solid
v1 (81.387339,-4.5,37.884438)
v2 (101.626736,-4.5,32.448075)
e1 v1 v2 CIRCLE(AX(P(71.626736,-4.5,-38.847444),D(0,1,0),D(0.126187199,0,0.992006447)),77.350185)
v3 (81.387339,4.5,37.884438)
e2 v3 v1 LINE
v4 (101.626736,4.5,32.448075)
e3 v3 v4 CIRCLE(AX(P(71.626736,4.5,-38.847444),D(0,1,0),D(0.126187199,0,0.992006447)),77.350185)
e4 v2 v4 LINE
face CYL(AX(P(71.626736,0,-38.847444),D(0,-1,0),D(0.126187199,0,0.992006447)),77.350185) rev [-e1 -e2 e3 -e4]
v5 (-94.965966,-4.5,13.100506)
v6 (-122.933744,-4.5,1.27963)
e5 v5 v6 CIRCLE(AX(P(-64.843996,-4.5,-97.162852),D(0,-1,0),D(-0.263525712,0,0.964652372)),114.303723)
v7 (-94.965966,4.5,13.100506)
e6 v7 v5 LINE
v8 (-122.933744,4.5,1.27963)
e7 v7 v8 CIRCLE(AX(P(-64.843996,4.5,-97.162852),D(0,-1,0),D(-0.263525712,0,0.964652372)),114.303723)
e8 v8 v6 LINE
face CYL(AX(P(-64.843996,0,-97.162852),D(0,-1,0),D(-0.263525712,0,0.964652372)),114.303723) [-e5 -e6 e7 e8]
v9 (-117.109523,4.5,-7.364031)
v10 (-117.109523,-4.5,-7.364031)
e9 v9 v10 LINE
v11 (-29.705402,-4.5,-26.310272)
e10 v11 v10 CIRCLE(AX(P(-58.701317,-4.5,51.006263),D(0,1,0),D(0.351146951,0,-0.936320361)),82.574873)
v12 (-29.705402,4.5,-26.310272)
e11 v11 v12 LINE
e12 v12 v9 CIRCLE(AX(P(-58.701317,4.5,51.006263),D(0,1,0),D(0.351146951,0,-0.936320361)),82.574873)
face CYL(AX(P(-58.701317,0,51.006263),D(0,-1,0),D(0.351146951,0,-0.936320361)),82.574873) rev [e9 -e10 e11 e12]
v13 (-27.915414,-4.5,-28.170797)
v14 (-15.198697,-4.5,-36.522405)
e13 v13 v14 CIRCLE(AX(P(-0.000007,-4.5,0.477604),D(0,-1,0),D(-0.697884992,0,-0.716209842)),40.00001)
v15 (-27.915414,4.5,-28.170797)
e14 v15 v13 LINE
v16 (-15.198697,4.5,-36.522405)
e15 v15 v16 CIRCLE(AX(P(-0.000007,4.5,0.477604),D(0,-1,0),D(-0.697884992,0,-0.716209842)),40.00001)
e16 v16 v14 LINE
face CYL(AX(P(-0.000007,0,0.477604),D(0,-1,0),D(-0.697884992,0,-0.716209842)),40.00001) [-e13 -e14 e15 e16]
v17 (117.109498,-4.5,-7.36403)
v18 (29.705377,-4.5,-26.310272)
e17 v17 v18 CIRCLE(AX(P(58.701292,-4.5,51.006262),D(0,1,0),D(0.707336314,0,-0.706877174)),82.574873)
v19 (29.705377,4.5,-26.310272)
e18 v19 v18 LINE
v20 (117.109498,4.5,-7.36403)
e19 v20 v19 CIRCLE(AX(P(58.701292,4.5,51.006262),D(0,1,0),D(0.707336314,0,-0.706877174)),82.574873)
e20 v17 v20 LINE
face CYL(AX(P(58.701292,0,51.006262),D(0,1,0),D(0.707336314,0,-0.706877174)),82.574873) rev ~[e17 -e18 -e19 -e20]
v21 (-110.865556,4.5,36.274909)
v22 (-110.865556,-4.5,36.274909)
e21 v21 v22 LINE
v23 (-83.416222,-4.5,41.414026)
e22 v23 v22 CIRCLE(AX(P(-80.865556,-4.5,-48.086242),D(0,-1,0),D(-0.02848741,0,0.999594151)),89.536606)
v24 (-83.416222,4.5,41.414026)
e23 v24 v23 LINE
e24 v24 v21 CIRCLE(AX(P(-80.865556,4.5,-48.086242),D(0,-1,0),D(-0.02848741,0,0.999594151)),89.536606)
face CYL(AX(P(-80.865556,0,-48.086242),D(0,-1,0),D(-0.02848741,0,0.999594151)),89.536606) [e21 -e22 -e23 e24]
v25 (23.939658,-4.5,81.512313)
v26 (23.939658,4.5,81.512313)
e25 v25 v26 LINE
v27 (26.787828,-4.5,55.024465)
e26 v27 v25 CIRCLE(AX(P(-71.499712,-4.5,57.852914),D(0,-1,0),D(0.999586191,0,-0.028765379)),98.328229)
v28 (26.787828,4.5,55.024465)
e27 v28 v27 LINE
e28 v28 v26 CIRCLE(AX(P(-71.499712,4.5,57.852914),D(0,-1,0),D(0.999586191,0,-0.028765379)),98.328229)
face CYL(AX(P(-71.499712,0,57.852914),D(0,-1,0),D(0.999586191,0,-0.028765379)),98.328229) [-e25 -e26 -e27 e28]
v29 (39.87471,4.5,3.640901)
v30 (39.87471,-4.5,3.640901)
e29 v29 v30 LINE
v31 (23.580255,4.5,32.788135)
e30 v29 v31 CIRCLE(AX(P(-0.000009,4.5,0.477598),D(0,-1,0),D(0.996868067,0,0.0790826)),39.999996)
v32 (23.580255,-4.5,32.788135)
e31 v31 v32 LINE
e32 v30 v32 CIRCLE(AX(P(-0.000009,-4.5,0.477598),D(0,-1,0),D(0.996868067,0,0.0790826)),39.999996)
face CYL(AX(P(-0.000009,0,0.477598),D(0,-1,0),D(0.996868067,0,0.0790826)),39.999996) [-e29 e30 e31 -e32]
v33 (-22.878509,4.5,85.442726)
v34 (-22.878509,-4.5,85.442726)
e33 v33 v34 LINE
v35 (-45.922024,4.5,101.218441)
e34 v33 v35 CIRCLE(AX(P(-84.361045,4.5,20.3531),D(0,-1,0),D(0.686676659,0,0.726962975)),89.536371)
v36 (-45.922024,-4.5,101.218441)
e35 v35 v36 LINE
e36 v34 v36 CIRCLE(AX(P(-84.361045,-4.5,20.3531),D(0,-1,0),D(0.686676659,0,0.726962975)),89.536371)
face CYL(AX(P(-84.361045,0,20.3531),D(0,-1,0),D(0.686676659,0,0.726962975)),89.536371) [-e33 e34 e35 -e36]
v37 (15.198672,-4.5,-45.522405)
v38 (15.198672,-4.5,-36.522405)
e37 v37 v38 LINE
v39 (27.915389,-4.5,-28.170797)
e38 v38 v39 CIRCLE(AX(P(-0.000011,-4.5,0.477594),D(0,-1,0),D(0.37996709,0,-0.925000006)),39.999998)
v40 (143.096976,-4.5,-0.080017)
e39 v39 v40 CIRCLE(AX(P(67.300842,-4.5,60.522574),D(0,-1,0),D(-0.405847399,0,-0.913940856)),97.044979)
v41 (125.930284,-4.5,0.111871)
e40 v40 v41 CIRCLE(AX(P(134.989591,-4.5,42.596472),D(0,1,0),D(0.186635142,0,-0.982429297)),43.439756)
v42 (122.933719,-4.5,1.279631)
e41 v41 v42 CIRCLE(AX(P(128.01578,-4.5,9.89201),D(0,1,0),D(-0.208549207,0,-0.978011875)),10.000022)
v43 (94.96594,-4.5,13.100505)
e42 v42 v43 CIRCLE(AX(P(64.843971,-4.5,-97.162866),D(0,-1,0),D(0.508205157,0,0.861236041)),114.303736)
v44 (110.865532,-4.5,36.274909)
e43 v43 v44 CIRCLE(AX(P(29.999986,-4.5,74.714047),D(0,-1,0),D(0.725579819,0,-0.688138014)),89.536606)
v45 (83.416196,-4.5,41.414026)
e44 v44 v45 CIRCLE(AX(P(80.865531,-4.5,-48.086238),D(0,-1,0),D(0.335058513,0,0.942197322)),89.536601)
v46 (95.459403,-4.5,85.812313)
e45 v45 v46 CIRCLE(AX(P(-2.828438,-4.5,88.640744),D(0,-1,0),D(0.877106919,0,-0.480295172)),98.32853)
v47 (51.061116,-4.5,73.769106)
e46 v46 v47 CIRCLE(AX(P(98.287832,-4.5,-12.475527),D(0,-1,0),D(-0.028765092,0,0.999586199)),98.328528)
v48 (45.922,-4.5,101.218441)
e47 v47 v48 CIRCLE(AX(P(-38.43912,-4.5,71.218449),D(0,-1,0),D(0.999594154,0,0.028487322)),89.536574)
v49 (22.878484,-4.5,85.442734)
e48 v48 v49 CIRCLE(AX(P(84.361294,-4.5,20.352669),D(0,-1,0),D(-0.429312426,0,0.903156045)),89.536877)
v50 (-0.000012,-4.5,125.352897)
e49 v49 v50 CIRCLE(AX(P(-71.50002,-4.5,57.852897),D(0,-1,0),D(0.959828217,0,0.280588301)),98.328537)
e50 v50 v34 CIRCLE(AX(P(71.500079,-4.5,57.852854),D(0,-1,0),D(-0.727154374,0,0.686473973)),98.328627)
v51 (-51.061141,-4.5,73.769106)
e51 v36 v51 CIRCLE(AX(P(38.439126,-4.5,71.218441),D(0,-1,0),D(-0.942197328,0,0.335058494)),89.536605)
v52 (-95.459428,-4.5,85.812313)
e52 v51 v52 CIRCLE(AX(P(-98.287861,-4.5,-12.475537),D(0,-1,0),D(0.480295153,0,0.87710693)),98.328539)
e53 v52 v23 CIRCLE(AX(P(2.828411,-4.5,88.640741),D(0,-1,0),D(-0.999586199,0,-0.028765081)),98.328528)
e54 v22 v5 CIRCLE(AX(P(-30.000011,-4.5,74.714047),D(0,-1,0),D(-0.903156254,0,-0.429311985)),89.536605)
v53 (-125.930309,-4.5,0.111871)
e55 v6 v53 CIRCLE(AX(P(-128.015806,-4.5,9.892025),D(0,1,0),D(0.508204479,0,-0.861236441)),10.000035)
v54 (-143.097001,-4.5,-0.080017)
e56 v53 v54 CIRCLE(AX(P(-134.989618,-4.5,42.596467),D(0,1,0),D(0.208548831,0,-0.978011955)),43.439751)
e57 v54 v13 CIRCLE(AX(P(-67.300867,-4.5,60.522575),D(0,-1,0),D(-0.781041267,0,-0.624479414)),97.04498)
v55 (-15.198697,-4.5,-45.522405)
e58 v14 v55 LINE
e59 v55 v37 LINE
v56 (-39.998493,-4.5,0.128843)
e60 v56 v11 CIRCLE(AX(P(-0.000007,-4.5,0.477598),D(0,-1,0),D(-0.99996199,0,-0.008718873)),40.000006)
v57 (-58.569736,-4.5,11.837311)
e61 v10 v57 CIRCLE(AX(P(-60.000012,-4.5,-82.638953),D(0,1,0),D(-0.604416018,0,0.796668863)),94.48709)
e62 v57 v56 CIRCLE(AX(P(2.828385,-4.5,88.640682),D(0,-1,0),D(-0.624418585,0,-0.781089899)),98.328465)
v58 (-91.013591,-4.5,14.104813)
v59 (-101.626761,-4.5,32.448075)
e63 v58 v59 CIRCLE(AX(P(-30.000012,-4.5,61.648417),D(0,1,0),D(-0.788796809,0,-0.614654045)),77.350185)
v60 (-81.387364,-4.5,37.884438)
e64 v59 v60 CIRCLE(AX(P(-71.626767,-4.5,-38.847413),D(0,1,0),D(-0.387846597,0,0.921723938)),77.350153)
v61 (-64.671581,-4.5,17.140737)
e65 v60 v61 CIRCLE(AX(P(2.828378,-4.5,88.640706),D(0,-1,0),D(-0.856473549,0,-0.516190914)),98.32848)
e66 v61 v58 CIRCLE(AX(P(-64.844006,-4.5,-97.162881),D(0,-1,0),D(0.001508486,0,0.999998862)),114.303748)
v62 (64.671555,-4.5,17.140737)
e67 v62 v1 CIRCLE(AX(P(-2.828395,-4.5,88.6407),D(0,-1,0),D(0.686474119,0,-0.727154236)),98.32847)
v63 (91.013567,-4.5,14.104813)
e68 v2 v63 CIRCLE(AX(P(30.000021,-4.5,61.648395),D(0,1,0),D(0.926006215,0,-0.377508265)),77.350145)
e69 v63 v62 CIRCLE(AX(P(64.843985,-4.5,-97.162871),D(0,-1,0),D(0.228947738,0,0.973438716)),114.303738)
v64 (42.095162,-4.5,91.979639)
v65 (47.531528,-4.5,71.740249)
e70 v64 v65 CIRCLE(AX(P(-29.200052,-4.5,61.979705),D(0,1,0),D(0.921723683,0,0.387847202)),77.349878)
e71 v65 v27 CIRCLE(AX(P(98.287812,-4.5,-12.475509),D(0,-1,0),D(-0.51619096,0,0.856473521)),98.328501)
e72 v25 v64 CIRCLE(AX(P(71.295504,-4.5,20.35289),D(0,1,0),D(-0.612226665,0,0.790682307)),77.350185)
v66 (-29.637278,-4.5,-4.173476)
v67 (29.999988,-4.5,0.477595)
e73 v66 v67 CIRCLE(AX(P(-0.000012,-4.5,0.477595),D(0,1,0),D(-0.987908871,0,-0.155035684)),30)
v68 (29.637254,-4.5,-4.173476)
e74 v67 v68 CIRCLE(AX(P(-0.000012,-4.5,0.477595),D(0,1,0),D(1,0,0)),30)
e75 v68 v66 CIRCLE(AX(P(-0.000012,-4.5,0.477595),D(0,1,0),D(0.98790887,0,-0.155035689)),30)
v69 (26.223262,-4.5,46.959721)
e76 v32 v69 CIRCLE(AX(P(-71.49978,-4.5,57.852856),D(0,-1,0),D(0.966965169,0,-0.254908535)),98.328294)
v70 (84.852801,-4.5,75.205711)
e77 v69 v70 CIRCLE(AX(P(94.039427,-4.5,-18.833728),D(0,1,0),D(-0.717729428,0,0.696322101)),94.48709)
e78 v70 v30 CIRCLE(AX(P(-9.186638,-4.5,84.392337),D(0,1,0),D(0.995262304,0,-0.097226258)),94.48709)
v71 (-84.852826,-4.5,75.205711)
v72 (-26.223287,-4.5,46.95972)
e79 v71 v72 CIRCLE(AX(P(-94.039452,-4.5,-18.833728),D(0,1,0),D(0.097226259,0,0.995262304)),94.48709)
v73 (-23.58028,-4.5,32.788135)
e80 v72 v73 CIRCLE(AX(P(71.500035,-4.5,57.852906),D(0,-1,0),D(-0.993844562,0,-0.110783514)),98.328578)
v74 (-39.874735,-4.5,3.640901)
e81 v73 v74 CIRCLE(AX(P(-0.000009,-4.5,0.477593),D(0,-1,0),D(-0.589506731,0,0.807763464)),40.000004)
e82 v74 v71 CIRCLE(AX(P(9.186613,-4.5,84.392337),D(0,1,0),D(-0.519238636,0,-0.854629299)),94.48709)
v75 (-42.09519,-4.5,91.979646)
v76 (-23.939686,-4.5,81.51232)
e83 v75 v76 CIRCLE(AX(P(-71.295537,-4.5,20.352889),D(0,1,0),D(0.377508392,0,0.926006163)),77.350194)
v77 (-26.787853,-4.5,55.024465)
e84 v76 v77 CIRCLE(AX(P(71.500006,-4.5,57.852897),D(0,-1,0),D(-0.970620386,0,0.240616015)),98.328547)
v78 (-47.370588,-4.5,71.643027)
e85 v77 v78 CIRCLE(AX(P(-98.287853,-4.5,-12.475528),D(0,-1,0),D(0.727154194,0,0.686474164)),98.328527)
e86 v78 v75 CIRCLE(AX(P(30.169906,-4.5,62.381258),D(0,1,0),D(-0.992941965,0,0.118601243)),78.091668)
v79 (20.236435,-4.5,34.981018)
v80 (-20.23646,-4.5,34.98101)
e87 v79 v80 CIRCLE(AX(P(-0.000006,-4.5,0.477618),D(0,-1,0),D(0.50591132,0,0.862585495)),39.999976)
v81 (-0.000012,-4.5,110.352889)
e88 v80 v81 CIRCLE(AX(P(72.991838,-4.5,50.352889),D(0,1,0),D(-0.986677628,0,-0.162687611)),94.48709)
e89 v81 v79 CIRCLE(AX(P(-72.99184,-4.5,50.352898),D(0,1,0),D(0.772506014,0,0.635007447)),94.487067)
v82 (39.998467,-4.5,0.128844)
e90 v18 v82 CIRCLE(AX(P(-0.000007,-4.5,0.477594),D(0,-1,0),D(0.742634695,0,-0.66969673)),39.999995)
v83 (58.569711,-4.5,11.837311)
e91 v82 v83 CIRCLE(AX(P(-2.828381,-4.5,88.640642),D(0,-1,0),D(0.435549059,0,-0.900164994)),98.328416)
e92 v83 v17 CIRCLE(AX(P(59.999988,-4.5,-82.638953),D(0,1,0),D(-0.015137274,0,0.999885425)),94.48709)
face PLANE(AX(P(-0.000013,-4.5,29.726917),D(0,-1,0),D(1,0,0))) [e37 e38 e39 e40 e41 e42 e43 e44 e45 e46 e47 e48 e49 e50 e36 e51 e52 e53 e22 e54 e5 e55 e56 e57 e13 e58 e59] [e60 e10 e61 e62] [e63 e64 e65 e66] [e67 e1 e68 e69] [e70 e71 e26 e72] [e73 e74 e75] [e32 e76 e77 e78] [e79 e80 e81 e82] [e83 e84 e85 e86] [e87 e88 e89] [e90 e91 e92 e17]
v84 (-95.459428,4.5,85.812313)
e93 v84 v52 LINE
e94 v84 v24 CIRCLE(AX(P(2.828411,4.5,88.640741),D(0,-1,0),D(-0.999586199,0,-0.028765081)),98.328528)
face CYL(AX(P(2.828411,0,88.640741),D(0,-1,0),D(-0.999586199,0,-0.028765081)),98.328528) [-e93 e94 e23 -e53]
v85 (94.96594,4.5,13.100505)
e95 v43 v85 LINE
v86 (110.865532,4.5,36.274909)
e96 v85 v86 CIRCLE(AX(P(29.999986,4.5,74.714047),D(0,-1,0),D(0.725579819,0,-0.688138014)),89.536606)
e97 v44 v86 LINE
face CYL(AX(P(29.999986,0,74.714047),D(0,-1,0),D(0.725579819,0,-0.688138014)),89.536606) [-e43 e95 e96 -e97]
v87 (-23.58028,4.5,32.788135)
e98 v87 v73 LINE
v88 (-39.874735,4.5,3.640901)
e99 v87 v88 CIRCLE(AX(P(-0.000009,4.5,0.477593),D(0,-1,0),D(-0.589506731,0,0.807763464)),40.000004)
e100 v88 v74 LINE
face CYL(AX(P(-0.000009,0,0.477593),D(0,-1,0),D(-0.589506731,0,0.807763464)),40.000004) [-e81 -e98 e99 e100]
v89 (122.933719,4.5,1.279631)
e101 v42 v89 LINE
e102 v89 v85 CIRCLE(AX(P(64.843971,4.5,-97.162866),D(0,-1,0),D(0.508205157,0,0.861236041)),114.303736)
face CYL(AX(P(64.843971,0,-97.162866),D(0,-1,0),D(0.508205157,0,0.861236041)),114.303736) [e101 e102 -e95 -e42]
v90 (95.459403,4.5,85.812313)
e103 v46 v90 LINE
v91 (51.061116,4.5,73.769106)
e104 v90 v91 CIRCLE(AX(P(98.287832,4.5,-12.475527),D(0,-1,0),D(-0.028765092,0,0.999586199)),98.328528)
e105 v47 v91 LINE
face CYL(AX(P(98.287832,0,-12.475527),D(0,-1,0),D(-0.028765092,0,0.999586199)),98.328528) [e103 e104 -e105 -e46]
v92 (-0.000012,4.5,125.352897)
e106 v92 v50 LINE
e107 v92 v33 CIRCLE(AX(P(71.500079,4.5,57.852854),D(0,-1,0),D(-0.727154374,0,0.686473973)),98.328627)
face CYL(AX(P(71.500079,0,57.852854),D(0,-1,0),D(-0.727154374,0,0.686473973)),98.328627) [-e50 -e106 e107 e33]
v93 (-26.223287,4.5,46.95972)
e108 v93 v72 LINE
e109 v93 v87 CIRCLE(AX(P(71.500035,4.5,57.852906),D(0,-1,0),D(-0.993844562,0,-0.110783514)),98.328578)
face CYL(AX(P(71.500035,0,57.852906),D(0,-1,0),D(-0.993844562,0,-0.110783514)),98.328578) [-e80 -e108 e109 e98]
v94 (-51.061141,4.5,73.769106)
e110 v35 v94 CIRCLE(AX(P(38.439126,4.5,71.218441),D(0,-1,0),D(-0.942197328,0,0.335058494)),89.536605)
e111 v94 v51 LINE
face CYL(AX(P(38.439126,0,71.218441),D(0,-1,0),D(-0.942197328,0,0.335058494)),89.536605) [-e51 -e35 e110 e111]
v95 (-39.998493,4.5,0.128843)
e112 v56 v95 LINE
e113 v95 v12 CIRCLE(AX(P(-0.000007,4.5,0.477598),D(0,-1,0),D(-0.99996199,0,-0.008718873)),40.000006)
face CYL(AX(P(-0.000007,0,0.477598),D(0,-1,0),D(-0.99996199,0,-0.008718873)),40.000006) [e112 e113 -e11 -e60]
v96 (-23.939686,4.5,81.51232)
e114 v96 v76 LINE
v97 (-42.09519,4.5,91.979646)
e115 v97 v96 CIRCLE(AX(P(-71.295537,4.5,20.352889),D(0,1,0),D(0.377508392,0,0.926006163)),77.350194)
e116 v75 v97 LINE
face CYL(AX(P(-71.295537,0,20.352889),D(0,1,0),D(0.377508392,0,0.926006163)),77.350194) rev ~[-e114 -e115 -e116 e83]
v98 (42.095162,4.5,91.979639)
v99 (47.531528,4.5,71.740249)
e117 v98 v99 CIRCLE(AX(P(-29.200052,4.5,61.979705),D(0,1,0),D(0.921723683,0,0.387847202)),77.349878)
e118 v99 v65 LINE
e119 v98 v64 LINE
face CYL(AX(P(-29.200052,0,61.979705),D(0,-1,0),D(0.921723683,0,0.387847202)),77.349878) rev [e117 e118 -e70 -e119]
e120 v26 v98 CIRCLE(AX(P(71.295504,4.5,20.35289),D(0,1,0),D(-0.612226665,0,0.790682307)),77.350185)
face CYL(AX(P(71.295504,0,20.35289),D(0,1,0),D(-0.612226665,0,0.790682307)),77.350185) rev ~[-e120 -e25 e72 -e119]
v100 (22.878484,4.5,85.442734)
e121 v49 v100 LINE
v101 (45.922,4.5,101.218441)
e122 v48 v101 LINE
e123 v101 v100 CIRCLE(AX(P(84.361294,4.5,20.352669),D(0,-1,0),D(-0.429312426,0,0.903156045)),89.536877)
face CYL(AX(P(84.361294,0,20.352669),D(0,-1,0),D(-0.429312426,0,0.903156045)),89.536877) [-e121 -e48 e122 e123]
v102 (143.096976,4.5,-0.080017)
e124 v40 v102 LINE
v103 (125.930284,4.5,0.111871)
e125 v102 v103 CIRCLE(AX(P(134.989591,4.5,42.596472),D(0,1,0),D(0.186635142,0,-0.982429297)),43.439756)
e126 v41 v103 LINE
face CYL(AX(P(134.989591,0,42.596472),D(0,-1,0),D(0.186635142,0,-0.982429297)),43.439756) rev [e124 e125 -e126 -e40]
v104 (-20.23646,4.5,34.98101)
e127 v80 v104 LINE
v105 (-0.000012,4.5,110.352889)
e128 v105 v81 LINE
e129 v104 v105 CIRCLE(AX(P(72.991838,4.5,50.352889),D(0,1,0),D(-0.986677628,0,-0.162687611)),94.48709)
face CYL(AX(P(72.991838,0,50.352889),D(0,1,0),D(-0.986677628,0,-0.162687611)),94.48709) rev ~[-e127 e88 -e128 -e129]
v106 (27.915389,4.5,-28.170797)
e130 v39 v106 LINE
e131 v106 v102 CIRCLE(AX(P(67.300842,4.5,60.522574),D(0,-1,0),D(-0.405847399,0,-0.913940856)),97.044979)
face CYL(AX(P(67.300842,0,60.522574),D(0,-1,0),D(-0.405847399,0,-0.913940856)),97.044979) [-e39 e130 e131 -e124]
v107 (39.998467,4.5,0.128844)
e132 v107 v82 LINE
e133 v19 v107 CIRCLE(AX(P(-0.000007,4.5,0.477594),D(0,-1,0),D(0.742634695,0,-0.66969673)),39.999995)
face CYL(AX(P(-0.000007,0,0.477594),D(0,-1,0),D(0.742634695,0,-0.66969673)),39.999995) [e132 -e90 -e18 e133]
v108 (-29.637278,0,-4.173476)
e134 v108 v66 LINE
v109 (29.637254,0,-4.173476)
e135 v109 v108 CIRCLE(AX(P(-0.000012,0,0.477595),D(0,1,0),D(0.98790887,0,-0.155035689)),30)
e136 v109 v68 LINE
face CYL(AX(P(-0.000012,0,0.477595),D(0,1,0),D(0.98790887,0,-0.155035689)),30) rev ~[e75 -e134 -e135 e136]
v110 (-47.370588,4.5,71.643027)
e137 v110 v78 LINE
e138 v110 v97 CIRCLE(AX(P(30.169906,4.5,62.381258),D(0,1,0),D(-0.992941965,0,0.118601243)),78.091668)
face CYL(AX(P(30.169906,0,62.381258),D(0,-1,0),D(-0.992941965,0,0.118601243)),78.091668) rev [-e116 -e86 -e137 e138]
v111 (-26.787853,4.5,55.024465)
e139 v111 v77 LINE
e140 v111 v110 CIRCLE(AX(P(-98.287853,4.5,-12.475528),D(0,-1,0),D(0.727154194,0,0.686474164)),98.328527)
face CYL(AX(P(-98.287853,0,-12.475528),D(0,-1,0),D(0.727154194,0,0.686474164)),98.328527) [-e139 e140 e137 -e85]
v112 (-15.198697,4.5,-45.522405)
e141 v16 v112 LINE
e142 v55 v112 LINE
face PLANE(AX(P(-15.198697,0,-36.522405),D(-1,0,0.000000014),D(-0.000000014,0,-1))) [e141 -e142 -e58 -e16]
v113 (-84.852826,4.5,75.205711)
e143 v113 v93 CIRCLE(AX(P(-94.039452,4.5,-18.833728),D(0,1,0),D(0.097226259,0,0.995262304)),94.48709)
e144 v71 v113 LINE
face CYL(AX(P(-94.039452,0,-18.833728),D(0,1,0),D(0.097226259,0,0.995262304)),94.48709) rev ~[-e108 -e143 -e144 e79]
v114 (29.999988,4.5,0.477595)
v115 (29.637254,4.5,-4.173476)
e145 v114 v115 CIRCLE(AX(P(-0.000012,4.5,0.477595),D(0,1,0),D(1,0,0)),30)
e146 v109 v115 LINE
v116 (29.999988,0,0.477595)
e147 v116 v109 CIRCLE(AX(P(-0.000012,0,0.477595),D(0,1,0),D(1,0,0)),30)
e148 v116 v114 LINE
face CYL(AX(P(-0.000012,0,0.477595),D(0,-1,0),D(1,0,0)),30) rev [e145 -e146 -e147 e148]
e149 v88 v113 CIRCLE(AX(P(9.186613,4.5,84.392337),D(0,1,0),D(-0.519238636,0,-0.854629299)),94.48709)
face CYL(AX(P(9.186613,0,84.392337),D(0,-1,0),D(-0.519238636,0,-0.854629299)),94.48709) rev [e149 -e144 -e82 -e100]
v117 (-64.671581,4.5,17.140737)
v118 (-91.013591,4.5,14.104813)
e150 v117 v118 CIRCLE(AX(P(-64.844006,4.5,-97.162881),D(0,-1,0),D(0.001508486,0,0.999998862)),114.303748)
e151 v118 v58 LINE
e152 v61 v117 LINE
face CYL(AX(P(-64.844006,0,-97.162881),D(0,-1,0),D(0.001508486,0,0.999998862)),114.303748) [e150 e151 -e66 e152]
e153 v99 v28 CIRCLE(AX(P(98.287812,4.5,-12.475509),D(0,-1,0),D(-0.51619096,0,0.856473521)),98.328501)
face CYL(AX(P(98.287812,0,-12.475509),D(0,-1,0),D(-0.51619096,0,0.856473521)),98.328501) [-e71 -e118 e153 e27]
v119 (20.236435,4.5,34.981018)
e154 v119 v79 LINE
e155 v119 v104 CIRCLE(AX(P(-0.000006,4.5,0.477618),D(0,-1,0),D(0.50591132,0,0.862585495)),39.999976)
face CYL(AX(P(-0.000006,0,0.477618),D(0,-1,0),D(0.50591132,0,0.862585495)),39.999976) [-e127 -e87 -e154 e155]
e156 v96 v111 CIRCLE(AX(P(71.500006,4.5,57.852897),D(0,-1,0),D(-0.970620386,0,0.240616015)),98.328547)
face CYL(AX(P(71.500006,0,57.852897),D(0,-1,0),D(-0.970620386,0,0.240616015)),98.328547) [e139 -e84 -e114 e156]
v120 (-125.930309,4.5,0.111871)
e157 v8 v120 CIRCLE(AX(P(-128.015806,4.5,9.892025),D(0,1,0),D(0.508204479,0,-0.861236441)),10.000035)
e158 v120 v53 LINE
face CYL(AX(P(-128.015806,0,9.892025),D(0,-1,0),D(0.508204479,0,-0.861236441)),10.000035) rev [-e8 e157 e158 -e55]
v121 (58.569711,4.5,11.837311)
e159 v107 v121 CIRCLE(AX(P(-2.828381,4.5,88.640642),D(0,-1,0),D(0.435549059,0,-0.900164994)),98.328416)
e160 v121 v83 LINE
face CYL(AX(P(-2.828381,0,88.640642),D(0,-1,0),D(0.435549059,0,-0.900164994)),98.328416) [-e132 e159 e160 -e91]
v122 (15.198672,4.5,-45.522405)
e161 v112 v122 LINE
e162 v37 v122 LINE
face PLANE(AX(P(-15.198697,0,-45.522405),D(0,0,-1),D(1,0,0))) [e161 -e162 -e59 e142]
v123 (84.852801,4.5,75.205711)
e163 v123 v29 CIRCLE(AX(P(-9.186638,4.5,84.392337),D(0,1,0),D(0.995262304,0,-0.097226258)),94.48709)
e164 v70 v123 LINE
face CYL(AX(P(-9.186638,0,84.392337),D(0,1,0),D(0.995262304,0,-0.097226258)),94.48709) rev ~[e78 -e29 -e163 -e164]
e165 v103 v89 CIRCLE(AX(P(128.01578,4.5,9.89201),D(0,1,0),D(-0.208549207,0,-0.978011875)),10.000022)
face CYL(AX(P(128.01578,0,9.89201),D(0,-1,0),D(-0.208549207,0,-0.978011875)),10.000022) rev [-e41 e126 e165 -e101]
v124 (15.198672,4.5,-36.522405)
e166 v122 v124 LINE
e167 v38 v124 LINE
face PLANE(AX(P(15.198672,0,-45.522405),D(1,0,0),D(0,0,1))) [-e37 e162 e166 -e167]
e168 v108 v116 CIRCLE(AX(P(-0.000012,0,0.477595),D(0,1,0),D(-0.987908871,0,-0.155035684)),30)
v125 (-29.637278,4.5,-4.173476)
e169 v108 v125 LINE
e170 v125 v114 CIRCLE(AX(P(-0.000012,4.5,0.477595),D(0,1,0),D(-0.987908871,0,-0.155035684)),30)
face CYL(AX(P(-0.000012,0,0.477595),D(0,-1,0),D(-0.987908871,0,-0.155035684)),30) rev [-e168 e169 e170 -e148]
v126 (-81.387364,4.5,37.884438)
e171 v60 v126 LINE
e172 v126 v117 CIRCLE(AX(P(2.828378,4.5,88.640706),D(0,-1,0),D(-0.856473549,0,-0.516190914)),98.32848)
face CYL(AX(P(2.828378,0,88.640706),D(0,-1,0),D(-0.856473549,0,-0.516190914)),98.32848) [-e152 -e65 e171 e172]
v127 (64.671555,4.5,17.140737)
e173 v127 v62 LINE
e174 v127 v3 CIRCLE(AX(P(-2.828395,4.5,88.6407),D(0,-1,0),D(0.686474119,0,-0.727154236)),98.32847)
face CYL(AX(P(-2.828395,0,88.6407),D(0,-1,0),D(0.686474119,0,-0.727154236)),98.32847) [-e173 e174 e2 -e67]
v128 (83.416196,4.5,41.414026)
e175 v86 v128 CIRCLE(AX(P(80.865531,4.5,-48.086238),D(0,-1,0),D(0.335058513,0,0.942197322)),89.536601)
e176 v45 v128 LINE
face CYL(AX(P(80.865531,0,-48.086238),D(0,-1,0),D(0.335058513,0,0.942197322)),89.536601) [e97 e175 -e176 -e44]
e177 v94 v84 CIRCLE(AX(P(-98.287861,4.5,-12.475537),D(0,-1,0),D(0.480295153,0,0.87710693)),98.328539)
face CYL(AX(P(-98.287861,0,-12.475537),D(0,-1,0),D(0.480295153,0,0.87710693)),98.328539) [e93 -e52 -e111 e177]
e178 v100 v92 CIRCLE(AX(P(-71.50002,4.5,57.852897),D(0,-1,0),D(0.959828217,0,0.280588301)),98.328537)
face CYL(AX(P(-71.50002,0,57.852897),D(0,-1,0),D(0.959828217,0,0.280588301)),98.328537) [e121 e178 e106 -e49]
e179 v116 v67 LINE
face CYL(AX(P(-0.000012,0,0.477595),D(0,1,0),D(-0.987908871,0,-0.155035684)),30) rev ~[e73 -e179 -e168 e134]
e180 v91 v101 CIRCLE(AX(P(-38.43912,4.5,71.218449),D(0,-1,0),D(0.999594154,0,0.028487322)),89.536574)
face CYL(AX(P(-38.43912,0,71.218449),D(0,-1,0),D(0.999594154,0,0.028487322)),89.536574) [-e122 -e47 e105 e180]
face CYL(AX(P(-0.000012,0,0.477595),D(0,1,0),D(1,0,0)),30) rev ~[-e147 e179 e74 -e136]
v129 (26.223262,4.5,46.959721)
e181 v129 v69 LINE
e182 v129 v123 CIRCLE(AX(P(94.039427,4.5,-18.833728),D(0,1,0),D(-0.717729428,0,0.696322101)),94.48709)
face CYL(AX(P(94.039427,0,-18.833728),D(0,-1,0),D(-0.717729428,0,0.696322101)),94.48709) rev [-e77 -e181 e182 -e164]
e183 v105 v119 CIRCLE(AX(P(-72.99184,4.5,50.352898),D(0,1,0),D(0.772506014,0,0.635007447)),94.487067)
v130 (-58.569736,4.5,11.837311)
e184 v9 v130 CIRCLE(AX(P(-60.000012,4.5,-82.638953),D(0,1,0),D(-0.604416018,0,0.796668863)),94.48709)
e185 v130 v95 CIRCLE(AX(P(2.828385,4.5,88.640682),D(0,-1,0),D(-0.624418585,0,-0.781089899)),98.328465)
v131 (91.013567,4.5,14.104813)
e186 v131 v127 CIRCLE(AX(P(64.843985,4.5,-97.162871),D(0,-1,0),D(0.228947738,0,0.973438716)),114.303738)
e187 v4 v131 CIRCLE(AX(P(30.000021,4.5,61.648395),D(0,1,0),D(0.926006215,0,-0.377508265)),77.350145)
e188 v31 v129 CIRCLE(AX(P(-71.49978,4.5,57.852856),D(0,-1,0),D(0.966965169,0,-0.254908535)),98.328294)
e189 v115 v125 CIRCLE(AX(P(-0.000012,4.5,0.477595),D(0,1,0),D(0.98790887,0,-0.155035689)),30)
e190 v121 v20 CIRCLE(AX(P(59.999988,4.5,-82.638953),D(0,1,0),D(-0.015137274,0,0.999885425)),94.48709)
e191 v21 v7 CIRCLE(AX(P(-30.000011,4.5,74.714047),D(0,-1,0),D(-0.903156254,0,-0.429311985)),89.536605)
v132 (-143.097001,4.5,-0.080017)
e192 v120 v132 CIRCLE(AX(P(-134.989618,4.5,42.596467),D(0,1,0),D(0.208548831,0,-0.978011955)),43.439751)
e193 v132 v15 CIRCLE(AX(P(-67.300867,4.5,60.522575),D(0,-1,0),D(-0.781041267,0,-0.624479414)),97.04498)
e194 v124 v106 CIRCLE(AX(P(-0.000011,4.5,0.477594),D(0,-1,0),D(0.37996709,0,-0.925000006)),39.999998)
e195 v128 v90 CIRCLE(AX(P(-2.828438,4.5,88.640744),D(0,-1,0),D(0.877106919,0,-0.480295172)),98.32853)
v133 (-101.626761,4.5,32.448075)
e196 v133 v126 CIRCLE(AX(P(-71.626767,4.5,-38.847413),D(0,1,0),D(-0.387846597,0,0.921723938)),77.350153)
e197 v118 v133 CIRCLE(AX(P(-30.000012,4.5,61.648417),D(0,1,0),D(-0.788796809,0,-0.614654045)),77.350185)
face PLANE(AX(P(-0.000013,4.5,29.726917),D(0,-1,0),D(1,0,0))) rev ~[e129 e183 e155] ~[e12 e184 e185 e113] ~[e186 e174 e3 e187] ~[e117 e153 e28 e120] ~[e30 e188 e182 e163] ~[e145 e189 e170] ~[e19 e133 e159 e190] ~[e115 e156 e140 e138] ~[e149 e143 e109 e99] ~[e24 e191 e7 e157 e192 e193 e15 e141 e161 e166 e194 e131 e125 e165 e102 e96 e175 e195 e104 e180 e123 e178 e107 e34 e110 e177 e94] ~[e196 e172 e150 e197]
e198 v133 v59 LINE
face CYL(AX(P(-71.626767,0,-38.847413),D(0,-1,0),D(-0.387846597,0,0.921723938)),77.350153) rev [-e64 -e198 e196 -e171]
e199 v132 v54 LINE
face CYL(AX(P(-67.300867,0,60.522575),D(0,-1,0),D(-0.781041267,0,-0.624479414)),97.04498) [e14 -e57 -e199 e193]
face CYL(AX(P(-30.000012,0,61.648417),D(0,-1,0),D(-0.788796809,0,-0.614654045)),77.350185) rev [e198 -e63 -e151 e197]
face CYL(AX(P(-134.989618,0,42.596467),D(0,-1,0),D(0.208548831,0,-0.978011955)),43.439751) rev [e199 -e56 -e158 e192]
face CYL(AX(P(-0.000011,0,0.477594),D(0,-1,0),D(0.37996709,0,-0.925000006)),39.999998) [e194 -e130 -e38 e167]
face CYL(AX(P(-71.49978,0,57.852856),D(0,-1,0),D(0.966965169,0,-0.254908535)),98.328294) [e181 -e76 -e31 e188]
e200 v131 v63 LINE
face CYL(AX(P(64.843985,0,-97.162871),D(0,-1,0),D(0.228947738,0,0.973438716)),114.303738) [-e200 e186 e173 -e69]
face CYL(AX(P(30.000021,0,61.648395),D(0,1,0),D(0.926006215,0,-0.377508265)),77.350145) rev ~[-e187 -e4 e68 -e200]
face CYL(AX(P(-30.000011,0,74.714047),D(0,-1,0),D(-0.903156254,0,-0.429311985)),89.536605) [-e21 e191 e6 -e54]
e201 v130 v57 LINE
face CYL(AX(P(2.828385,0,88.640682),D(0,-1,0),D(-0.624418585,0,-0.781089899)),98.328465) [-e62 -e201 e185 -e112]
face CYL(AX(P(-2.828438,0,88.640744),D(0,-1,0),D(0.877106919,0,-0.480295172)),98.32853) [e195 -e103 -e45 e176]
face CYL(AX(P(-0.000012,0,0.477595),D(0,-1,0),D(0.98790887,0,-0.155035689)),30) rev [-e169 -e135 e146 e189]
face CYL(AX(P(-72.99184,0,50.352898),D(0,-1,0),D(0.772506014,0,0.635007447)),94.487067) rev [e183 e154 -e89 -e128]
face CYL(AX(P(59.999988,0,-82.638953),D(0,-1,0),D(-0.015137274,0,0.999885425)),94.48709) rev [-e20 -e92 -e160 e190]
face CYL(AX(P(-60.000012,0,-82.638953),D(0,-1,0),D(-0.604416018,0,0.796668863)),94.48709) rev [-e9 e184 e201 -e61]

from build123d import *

# Parameters (mm, degrees)
F1_DEPTH = 4.5


# Not quite as in the source:
# - ends of sketch curves that miss each other by under 0.0002 mm in the source are joined


with BuildPart() as f1:
    # F0 (on Front) → F1 (new body, symmetric)
    with BuildSketch(Plane.XZ):
        with BuildLine():
            ThreePointArc((22.8784841202, 85.4427339913), (13.8060493669, 106.7545909747), (-1.20352e-05, 125.3528970532))
            ThreePointArc((-1.20352e-05, 125.3528970532), (-13.8060738367, 106.7545832167), (-22.8785085989, 85.4427260857))
            ThreePointArc((-22.8785085989, 85.4427260857), (-33.781429845, 94.2345199978), (-45.9220242093, 101.2184408782))
            ThreePointArc((-45.9220242093, 101.2184408782), (-49.5683429395, 87.6953665193), (-51.06114092, 73.7691058897))
            ThreePointArc((-51.06114092, 73.7691058897), (-72.5460800364, 82.4236845525), (-95.4594281867, 85.8123133595))
            ThreePointArc((-95.4594281867, 85.8123133595), (-92.0708001004, 62.8989646397), (-83.4162216453, 41.4140256538))
            ThreePointArc((-83.4162216453, 41.4140256538), (-97.3424818216, 39.9212276371), (-110.8655561911, 36.2749088727))
            ThreePointArc((-110.8655561911, 36.2749088727), (-103.8306945008, 24.0599857757), (-94.9659655862, 13.1005055314))
            ThreePointArc((-94.9659655862, 13.1005055314), (-109.3441086085, 8.1228594383), (-122.9337436667, 1.2796299938))
            ThreePointArc((-122.9337436667, 1.2796299938), (-124.3847743538, 0.5744976537), (-125.9303092338, 0.1118710562))
            ThreePointArc((-125.9303092338, 0.1118710562), (-134.5040813307, -0.8405705466), (-143.0970012567, -0.0800174007))
            ThreePointArc((-143.0970012567, -0.0800174007), (-90.2945054943, -33.7590284811), (-27.9154142382, -28.1707970164))
            ThreePointArc((-27.9154142382, -28.1707970164), (-21.9577774473, -32.956766848), (-15.1986970778, -36.5224048048))
            Line((-15.1986970778, -36.5224048048), (-15.1986972, -45.5224051023))
            Line((-15.1986972, -45.5224051023), (15.1986718, -45.5224051023))
            Line((15.1986718, -45.5224051023), (15.1986718, -36.5224051023))
            ThreePointArc((15.1986718, -36.5224051023), (21.9577523614, -32.9567672985), (27.9153889991, -28.1707973067))
            ThreePointArc((27.9153889991, -28.1707973067), (90.2944800943, -33.7590284811), (143.096975735, -0.0800170504))
            ThreePointArc((143.096975735, -0.0800170504), (134.5040559307, -0.8405705466), (125.9302837161, 0.1118705041))
            ThreePointArc((125.9302837161, 0.1118705041), (124.3847489538, 0.5744976537), (122.9337187314, 1.2796307814))
            ThreePointArc((122.9337187314, 1.2796307814), (109.3440836528, 8.1228592505), (94.9659404823, 13.1005047349))
            ThreePointArc((94.9659404823, 13.1005047349), (103.8306699794, 24.0599855987), (110.8655315962, 36.2749085192))
            ThreePointArc((110.8655315962, 36.2749085192), (97.3424564216, 39.9212276371), (83.416195792, 41.4140256177))
            ThreePointArc((83.416195792, 41.4140256177), (92.0707747004, 62.8989646397), (95.4594032906, 85.8123128836))
            ThreePointArc((95.4594032906, 85.8123128836), (72.5460546364, 82.4236845525), (51.0611157869, 73.7691059217))
            ThreePointArc((51.0611157869, 73.7691059217), (49.568318506, 87.695366698), (45.9219996628, 101.2184412045))
            ThreePointArc((45.9219996628, 101.2184412045), (33.7814018374, 94.2345137024), (22.8784841202, 85.4427339913))
        make_face()
        with BuildLine():
            ThreePointArc((-117.1095228717, -7.3640305351), (-89.448563488, 7.1418522166), (-58.5697361978, 11.837311045))
            ThreePointArc((-58.5697361978, 11.837311045), (-49.6119110254, 5.4631464022), (-39.9984925953, 0.1288430808))
            ThreePointArc((-39.9984925953, 0.1288430808), (-37.2748571799, -14.0339843315), (-29.705402075, -26.3102719896))
            ThreePointArc((-29.705402075, -26.3102719896), (-76.1944797379, -29.6944118928), (-117.1095228717, -7.3640305351))
        make_face(mode=Mode.SUBTRACT)
        with BuildLine():
            ThreePointArc((-91.0135912807, 14.1048128348), (-96.9513599422, 22.91124928), (-101.6267610462, 32.4480749604))
            ThreePointArc((-101.6267610462, 32.4480749604), (-91.6920273332, 35.8548732281), (-81.3873643524, 37.8844380956))
            ThreePointArc((-81.3873643524, 37.8844380956), (-73.7352473768, 26.9438563456), (-64.6715808547, 17.1407372042))
            ThreePointArc((-64.6715808547, 17.1407372042), (-77.9309186705, 16.3892197846), (-91.0135912807, 14.1048128348))
        make_face(mode=Mode.SUBTRACT)
        with BuildLine():
            ThreePointArc((-39.8747349061, 3.6409013815), (-70.812382671, 34.1134059196), (-84.8528261577, 75.2057109018))
            ThreePointArc((-84.8528261577, 75.2057109018), (-53.0294964681, 66.289674717), (-26.223286677, 46.9597204349))
            ThreePointArc((-26.223286677, 46.9597204349), (-25.1618451244, 39.8254262579), (-23.5802802502, 32.7881348844))
            ThreePointArc((-23.5802802502, 32.7881348844), (-34.9145400541, 19.9961948661), (-39.8747349061, 3.6409013815))
        make_face(mode=Mode.SUBTRACT)
        with BuildLine():
            ThreePointArc((58.569710798, 11.8373110298), (89.4485382345, 7.1418524965), (117.109497837, -7.3640300535))
            ThreePointArc((117.109497837, -7.3640300535), (76.1944543379, -29.6944118928), (29.7053768652, -26.3102719286))
            ThreePointArc((29.7053768652, -26.3102719286), (37.2748326568, -14.0339846476), (39.9984674303, 0.1288438922))
            ThreePointArc((39.9984674303, 0.1288438922), (49.6118856254, 5.4631464022), (58.569710798, 11.8373110298))
        make_face(mode=Mode.SUBTRACT)
        with BuildLine():
            ThreePointArc((-29.6372783208, -4.1734756121), (-2.3326090766, 30.3867739538), (29.9999878, 0.4775948977))
            ThreePointArc((29.9999878, 0.4775948977), (29.9091668501, -1.8550020562), (29.6372538967, -4.1734757653))
            ThreePointArc((29.6372538967, -4.1734757653), (-1.22775e-05, -29.5224051023), (-29.6372783208, -4.1734756121))
        make_face(mode=Mode.SUBTRACT)
        with BuildLine():
            ThreePointArc((26.2232617618, 46.9597209347), (53.0294713817, 66.2896748681), (84.8528008041, 75.2057108554))
            ThreePointArc((84.8528008041, 75.2057108554), (70.812357271, 34.1134059196), (39.8747095061, 3.6409013815))
            ThreePointArc((39.8747095061, 3.6409013815), (34.9145154377, 19.9961952532), (23.5802548967, 32.7881350301))
            ThreePointArc((23.5802548967, 32.7881350301), (25.161820701, 39.8254261326), (26.2232617618, 46.9597209347))
        make_face(mode=Mode.SUBTRACT)
        with BuildLine():
            ThreePointArc((81.3873389524, 37.8844380956), (91.6920019332, 35.8548732281), (101.6267360258, 32.4480754342))
            ThreePointArc((101.6267360258, 32.4480754342), (96.9513354477, 22.9112491166), (91.0135668807, 14.1048128348))
            ThreePointArc((91.0135668807, 14.1048128348), (77.930893754, 16.3892197289), (64.6715548016, 17.1407368356))
            ThreePointArc((64.6715548016, 17.1407368356), (73.7352219768, 26.9438563456), (81.3873389524, 37.8844380956))
        make_face(mode=Mode.SUBTRACT)
        with BuildLine():
            ThreePointArc((-47.3705884445, 71.6430268074), (-45.4199295453, 81.9895572502), (-42.0951898382, 91.9796457495))
            ThreePointArc((-42.0951898382, 91.9796457495), (-32.6613025725, 87.3636976735), (-23.9396864079, 81.5123196292))
            ThreePointArc((-23.9396864079, 81.5123196292), (-26.2649806939, 68.3652971805), (-26.7878526914, 55.0244649123))
            ThreePointArc((-26.7878526914, 55.0244649123), (-36.517789196, 64.0291013139), (-47.3705884445, 71.6430268074))
        make_face(mode=Mode.SUBTRACT)
        with BuildLine():
            ThreePointArc((-20.2364600157, 34.9810104129), (-18.2633780761, 74.8538230805), (-1.22419e-05, 110.352889417))
            ThreePointArc((-1.22419e-05, 110.352889417), (18.2633527585, 74.8538302889), (20.2364346157, 34.9810179281))
            ThreePointArc((20.2364346157, 34.9810179281), (-1.26313e-05, 40.4775948977), (-20.2364600157, 34.9810104129))
        make_face(mode=Mode.SUBTRACT)
        with BuildLine():
            ThreePointArc((23.9396582776, 81.5123130375), (32.6612744421, 87.3636910819), (42.0951621324, 91.9796391523))
            ThreePointArc((42.0951621324, 91.9796391523), (45.5019631468, 82.0449119699), (47.5315280138, 71.7402489249))
            ThreePointArc((47.5315280138, 71.7402489249), (36.5909469807, 64.0881318591), (26.7878276352, 55.0244650532))
            ThreePointArc((26.7878276352, 55.0244650532), (26.2649562826, 68.3652972858), (23.9396582776, 81.5123130375))
        make_face(mode=Mode.SUBTRACT)
    extrude(amount=F1_DEPTH, both=True)


solid = f1.part
